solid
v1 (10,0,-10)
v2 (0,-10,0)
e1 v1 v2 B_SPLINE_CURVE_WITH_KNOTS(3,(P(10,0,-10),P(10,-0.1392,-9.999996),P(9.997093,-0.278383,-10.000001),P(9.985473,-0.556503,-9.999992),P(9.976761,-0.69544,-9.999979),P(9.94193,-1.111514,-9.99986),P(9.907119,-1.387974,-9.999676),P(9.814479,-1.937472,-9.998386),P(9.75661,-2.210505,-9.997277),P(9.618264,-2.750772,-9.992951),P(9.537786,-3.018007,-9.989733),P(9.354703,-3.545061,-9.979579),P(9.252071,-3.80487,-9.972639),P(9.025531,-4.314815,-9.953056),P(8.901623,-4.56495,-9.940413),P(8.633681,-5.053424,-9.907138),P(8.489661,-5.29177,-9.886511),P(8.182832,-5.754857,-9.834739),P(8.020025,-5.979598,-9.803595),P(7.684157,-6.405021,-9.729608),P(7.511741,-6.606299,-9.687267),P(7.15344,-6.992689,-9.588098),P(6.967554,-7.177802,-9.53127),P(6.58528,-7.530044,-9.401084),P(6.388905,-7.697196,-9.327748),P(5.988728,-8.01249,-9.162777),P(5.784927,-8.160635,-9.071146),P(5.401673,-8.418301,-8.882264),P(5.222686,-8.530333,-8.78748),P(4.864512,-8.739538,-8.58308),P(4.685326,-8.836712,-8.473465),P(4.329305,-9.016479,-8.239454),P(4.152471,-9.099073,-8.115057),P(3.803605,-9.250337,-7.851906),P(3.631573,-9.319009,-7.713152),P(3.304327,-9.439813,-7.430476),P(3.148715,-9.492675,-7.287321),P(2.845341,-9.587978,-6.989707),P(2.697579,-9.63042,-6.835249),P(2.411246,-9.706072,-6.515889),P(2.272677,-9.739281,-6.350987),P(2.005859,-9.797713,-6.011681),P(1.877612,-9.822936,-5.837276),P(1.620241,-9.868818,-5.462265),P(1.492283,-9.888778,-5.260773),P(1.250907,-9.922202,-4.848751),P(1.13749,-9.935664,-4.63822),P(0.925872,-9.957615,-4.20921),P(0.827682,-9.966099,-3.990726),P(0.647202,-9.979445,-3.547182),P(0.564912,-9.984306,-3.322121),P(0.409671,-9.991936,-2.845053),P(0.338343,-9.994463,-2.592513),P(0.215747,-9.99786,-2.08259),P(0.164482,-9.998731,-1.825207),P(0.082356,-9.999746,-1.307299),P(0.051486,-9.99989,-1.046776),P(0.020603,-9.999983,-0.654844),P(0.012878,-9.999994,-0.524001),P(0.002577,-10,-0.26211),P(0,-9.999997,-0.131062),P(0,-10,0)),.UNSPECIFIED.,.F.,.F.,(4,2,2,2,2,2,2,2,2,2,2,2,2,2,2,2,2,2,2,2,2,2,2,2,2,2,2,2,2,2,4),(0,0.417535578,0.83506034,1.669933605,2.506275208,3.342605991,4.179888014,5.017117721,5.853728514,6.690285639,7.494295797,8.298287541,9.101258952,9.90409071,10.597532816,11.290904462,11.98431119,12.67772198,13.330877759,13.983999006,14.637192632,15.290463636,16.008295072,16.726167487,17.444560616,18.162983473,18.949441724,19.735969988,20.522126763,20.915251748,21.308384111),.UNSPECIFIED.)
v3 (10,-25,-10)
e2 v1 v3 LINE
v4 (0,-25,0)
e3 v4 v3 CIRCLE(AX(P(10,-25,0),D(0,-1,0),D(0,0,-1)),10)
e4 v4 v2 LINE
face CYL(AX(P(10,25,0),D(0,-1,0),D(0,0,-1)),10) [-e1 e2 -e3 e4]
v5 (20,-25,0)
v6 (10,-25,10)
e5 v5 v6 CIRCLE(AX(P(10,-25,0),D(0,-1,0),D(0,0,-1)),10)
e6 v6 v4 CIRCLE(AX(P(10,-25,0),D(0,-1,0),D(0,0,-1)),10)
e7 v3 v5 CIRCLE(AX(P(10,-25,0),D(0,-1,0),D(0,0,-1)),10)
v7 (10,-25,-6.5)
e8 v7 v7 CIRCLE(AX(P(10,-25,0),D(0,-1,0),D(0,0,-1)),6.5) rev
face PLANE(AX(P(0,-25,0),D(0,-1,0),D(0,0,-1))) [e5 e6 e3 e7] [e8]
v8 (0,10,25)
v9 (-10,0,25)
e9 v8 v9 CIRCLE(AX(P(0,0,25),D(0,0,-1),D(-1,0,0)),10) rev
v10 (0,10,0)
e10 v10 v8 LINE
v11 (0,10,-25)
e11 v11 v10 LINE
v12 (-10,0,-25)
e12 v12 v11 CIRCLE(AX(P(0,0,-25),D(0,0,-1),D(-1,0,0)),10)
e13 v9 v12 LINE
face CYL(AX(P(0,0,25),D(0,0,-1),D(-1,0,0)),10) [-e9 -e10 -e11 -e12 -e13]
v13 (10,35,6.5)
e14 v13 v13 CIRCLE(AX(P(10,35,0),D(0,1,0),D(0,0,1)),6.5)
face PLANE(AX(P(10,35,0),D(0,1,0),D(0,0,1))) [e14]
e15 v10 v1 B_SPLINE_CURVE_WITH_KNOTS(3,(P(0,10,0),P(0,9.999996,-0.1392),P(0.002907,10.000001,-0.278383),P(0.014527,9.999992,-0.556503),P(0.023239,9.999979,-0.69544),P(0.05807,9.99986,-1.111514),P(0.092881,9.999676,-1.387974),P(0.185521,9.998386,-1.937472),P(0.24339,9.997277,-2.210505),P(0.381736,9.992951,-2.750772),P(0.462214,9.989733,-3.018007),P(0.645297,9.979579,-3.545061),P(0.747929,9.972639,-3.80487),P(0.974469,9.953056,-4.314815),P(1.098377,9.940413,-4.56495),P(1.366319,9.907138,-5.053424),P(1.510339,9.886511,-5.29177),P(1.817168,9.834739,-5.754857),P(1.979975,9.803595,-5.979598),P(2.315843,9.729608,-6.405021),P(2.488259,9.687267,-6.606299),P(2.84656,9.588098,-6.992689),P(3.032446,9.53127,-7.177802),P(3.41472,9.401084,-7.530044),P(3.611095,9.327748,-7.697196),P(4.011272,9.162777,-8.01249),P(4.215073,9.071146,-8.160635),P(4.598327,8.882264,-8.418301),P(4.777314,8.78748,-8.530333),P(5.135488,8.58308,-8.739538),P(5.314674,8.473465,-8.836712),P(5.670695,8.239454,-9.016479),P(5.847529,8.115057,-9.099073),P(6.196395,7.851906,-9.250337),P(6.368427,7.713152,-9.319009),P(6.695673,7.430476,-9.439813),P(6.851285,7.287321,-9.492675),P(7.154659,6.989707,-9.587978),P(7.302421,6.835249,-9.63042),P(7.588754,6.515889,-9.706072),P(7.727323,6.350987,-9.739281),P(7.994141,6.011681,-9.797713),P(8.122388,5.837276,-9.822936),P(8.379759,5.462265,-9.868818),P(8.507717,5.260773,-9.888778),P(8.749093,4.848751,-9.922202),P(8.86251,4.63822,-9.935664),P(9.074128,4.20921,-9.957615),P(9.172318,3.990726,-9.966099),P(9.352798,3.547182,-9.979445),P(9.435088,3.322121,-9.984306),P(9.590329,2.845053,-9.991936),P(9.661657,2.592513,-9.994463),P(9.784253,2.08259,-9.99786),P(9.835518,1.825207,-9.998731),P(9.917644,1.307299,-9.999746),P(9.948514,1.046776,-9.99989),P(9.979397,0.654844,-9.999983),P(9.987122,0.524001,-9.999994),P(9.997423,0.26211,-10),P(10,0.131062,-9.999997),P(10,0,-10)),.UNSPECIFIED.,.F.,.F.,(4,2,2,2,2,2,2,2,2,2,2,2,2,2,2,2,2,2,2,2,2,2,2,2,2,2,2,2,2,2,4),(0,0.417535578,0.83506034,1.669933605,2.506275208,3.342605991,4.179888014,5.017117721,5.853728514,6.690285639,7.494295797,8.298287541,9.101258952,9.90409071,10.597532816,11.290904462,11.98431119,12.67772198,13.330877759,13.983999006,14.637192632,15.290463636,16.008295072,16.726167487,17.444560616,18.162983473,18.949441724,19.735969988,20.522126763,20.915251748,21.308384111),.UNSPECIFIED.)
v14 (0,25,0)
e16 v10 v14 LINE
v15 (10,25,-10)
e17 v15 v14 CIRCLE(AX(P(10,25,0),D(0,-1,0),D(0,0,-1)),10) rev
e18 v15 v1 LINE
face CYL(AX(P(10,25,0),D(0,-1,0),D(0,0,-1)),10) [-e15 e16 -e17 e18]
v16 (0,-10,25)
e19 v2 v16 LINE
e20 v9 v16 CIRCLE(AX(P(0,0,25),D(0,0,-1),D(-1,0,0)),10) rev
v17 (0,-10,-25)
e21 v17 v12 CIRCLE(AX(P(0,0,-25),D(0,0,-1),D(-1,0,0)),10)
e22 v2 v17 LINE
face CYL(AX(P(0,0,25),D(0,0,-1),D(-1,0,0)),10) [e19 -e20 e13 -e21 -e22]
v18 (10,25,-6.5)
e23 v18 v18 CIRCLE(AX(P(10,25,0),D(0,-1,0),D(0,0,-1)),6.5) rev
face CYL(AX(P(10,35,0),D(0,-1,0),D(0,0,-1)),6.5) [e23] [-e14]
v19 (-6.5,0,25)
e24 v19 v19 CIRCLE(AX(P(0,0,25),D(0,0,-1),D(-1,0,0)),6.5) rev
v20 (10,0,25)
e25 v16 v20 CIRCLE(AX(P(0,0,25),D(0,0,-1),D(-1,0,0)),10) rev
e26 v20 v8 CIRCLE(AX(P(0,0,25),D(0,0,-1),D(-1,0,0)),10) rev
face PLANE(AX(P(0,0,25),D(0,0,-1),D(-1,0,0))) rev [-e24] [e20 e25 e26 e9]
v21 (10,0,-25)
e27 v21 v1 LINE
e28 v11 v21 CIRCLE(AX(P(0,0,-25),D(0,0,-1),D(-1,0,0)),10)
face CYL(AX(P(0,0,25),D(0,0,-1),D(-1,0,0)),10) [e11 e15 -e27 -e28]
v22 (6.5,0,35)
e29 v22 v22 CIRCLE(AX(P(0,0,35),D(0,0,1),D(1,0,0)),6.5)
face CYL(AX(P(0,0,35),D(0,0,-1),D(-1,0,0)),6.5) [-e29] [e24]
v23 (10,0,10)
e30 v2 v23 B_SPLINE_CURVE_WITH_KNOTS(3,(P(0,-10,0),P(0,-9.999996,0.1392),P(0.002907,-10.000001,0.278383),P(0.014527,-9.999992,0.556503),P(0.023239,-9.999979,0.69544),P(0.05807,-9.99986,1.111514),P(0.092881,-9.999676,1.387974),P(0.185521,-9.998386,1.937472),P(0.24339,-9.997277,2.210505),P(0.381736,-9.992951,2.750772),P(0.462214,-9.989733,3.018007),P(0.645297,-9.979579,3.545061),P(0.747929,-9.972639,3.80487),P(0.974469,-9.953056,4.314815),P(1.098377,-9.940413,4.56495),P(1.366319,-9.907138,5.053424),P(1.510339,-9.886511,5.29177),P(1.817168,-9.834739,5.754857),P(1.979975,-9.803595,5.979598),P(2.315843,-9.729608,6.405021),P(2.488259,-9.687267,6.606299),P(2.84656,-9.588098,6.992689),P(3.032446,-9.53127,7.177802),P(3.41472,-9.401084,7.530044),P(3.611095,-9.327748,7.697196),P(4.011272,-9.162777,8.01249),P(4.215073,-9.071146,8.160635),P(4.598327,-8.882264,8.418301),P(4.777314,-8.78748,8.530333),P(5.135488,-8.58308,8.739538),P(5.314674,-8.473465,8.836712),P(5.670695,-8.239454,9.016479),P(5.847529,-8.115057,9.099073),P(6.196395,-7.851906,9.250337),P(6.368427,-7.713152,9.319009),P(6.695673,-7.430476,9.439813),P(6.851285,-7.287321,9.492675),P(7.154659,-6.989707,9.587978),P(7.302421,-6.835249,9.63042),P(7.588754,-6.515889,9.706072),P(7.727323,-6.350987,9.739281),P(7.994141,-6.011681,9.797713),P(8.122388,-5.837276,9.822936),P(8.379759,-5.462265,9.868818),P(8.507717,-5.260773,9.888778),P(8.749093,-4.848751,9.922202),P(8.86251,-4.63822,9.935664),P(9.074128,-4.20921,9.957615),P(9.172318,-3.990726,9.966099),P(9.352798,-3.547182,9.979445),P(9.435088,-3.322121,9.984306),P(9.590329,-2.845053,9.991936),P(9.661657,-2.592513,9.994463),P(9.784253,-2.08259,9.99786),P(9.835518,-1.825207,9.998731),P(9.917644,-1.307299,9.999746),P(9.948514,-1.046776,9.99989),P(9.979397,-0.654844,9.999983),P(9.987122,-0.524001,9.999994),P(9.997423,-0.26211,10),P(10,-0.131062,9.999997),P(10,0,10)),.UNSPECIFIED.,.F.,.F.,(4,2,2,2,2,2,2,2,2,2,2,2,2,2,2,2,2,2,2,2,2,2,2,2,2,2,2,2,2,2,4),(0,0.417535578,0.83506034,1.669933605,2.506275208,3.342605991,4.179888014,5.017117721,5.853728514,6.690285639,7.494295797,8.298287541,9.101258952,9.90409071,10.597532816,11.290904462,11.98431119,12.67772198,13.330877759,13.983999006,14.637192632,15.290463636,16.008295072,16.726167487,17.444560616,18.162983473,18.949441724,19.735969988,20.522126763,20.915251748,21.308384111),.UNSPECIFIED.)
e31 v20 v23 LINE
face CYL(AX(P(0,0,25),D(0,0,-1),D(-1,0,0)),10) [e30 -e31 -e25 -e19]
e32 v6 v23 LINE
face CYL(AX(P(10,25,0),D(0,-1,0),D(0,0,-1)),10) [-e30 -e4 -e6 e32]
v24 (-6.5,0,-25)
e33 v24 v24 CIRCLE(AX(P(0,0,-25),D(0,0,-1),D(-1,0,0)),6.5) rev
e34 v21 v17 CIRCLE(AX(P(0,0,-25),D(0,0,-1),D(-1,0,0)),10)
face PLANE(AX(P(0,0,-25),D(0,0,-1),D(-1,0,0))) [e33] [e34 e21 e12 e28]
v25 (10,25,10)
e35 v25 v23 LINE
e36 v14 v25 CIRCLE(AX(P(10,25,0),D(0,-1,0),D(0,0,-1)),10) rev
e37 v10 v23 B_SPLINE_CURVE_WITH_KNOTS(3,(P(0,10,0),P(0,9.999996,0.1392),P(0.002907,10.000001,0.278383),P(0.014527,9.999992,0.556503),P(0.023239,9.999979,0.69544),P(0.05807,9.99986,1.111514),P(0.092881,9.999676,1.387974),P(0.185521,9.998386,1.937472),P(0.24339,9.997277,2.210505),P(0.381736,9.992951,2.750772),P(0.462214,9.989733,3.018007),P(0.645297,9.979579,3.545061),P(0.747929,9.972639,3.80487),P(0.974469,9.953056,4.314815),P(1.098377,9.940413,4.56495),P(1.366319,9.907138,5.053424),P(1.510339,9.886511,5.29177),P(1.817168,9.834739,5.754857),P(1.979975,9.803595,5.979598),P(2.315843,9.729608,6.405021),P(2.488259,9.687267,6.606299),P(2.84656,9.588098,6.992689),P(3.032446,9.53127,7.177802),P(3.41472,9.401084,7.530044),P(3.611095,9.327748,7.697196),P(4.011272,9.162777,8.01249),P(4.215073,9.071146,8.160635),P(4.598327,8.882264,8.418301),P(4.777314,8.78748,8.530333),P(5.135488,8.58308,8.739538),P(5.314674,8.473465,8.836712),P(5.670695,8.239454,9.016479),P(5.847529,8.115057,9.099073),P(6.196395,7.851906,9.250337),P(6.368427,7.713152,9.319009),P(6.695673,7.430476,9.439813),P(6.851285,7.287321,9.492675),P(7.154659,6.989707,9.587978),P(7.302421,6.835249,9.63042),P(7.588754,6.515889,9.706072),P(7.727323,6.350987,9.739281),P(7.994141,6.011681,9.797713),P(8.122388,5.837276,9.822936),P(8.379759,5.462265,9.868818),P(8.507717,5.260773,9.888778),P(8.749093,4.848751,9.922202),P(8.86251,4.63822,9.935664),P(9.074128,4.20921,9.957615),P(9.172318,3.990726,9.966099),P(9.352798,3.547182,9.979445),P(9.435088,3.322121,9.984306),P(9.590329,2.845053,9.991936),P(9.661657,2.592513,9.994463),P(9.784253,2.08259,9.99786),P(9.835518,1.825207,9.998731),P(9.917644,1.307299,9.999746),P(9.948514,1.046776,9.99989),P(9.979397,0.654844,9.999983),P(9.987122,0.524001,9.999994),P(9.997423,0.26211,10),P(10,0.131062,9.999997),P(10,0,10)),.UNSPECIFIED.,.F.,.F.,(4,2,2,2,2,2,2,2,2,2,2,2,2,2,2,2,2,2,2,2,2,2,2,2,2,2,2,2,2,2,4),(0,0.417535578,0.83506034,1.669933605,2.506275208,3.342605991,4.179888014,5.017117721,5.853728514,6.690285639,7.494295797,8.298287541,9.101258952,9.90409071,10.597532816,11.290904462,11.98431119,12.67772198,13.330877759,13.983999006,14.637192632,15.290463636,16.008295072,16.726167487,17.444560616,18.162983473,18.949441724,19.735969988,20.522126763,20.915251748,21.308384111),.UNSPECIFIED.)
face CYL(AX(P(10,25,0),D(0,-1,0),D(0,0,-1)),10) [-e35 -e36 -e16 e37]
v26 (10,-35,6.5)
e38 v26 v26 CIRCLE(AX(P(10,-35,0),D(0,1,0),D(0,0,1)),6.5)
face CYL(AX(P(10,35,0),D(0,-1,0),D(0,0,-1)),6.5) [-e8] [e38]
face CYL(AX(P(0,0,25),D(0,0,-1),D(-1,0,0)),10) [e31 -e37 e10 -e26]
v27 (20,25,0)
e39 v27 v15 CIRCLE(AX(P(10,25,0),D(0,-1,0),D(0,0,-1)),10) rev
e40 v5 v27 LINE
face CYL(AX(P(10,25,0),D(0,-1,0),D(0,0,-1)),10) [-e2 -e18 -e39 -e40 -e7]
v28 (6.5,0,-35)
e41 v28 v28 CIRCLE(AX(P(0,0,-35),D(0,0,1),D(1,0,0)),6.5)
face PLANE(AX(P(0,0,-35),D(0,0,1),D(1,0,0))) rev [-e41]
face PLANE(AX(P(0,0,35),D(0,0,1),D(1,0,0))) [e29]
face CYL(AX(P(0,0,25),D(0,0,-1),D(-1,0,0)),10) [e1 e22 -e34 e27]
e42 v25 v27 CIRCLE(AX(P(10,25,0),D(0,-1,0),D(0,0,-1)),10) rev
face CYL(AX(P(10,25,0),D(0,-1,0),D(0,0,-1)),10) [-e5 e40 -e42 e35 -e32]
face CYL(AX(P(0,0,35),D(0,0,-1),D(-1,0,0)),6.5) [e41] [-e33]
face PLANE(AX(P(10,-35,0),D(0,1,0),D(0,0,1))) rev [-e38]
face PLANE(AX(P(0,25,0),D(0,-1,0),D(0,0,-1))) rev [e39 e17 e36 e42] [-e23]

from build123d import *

# Parameters (mm, degrees)
SKETCH2_W           = 20
SKETCH2_H           = 20
BOSS_EXTRUDE1_DEPTH = 25
SKETCH4_W           = 20
SKETCH4_H           = 20
BOSS_EXTRUDE2_DEPTH = 25
SKETCH5_R           = 6.5
BOSS_EXTRUDE3_DEPTH = 35
SKETCH7_R           = 6.5
BOSS_EXTRUDE4_DEPTH = 35
FILLET1_START       = -25
FILLET1_DEPTH       = 50
FILLET1_START_2     = 10
FILLET1_2_DEPTH     = 15
FILLET1_3_DEPTH     = 50
FILLET2_R           = 10
FILLET3_START       = -1e-07
FILLET3_DEPTH       = 25.0000001
FILLET3_START_2     = -25
FILLET3_2_DEPTH     = 34.870059035
FILLET3_START_3     = -10
FILLET3_3_DEPTH     = 20
FILLET4_R           = 10
FILLET5_START       = -25
FILLET5_DEPTH       = 50
FILLET5_2_DEPTH     = 24.9999999
FILLET5_START_2     = -10
FILLET5_3_DEPTH     = 20


with BuildPart() as part:
    # Sketch2 → Boss-Extrude1 (new, symmetric)
    with BuildSketch(Plane.XY):
        Rectangle(SKETCH2_W, SKETCH2_H)
    extrude(amount=BOSS_EXTRUDE1_DEPTH, both=True)

    # Sketch4 → Boss-Extrude2 (add, symmetric)
    with BuildSketch(Plane(origin=(0, 0, 0), x_dir=(1, 0, 0), z_dir=(0, 1, 0))):
        with Locations((10, 0)):
            Rectangle(SKETCH4_W, SKETCH4_H)
    extrude(amount=BOSS_EXTRUDE2_DEPTH, both=True)

    # Sketch5 → Boss-Extrude3 (add, symmetric)
    with BuildSketch(Plane(origin=(0, 0, 0), x_dir=(1, 0, 0), z_dir=(0, 1, 0))):
        with Locations(Location((10, 0, 0), (0, 0, 90))):
            Circle(SKETCH5_R)
    extrude(amount=BOSS_EXTRUDE3_DEPTH, both=True)

    # Sketch7 → Boss-Extrude4 (add, symmetric)
    with BuildSketch(Plane.XY):
        with Locations(Location((0, 0, 0), (0, 0, 180))):
            Circle(SKETCH7_R)
    extrude(amount=BOSS_EXTRUDE4_DEPTH, both=True)

    # Fillet1: read off the stored shape, not the designer's step
    # Fillet1 outline → Fillet1 (cut)
    with BuildSketch(Plane(origin=(0, 0, 0), x_dir=(1, 0, 0), z_dir=(0, 1, 0)).offset(FILLET1_START)):
        with BuildLine():
            Line((20, 10), (10, 10))
            ThreePointArc((10, 10), (17.071067812, 7.071067812), (20, 0))
            Line((20, 0), (20, 10))
        make_face()
    extrude(amount=FILLET1_DEPTH, mode=Mode.SUBTRACT)

    # Fillet1 2 outline → Fillet1 2 (cut)
    with BuildSketch(Plane(origin=(0, 0, 0), x_dir=(1, 0, 0), z_dir=(0, 1, 0)).offset(FILLET1_START_2)):
        with BuildLine():
            ThreePointArc((10, -10), (2.928932188, -7.071067812), (0, 0))
            Line((0, 0), (0, -10))
            Line((0, -10), (10, -10))
        make_face()
    extrude(amount=FILLET1_2_DEPTH, mode=Mode.SUBTRACT)

    # Fillet1 3 outline → Fillet1 3 (cut)
    with BuildSketch(Plane.XY.offset(FILLET1_START)):
        with BuildLine():
            Line((-10, 10), (-10, 0))
            ThreePointArc((-10, 0), (-7.071067812, 7.071067812), (0, 10))
            Line((0, 10), (-10, 10))
        make_face()
    extrude(amount=FILLET1_3_DEPTH, mode=Mode.SUBTRACT)

    # Fillet2
    fillet2_edges = [part.edges().sort_by_distance(p)[0] for p in [
        (20, 0, 10),
        (10, 10, -17.5),
        (10, -10, 17.5),
    ]]
    fillet(fillet2_edges, radius=FILLET2_R - 0.0001)  # a hair under: the kernel refuses the full size

    # Fillet3: read off the stored shape, not the designer's step
    # Fillet3 outline → Fillet3 (cut)
    with BuildSketch(Plane.XY.offset(FILLET3_START)):
        with BuildLine():
            Line((10, 10), (0, 10))
            ThreePointArc((0, 10), (7.071067812, 7.071067812), (10, 0))
            Line((10, 0), (10, 10))
        make_face()
        with BuildLine():
            Line((-10, -10), (0, -10))
            ThreePointArc((0, -10), (-7.071067812, -7.071067812), (-10, 0))
            Line((-10, 0), (-10, -10))
        make_face()
    extrude(amount=FILLET3_DEPTH, mode=Mode.SUBTRACT)

    # Fillet3 2 outline → Fillet3 2 (cut)
    with BuildSketch(Plane.XY.offset(FILLET3_START_2)):
        with BuildLine():
            Line((-10, -10), (0, -10))
            ThreePointArc((0, -10), (-7.071067812, -7.071067812), (-10, 0))
            Line((-10, 0), (-10, -10))
        make_face()
    extrude(amount=FILLET3_2_DEPTH, mode=Mode.SUBTRACT)

    # Fillet3 3 outline → Fillet3 3 (add)
    with BuildSketch(Plane(origin=(0, 0, 0), x_dir=(1, 0, 0), z_dir=(0, 1, 0)).offset(FILLET3_START_3)):
        with BuildLine():
            ThreePointArc((0, 0), (2.928932188, -7.071067812), (10, -10))
            Line((10, -10), (10, 1e-07))
            Line((10, 1e-07), (0, 0))
        make_face()
    extrude(amount=FILLET3_3_DEPTH)

    # Fillet4
    fillet4_edges = [part.edges().sort_by_distance(p)[0] for p in [
        (10, -10, -17.5),
    ]]
    fillet(fillet4_edges, radius=FILLET4_R - 0.0001)  # a hair under: the kernel refuses the full size

    # Fillet5: read off the stored shape, not the designer's step
    # Fillet5 outline → Fillet5 (cut)
    with BuildSketch(Plane(origin=(0, 0, 0), x_dir=(1, 0, 0), z_dir=(0, 1, 0)).offset(FILLET5_START)):
        with BuildLine():
            Line((0, 10), (0, 0))
            ThreePointArc((0, 0), (2.928932188, 7.071067812), (10, 10))
            Line((10, 10), (0, 10))
        make_face()
    extrude(amount=FILLET5_DEPTH, mode=Mode.SUBTRACT)

    # Fillet5 2 outline → Fillet5 2 (cut)
    with BuildSketch(Plane(origin=(0, 0, 0), x_dir=(1, 0, 0), z_dir=(0, 1, 0)).offset(FILLET5_START)):
        with BuildLine():
            ThreePointArc((10, -10), (2.928932188, -7.071067812), (0, 0))
            Line((0, 0), (0, -10))
            Line((0, -10), (10, -10))
        make_face()
    extrude(amount=FILLET5_2_DEPTH, mode=Mode.SUBTRACT)

    # Fillet5 3 outline → Fillet5 3 (add)
    with BuildSketch(Plane.XY.offset(FILLET5_START_2)):
        with BuildLine():
            ThreePointArc((10, 0), (7.071067812, 7.071067812), (0, 10))
            Line((0, 10), (0, -10))
            ThreePointArc((0, -10), (7.071067812, -7.071067812), (10, 0))
        make_face()
    extrude(amount=FILLET5_3_DEPTH)


solid = part.part
